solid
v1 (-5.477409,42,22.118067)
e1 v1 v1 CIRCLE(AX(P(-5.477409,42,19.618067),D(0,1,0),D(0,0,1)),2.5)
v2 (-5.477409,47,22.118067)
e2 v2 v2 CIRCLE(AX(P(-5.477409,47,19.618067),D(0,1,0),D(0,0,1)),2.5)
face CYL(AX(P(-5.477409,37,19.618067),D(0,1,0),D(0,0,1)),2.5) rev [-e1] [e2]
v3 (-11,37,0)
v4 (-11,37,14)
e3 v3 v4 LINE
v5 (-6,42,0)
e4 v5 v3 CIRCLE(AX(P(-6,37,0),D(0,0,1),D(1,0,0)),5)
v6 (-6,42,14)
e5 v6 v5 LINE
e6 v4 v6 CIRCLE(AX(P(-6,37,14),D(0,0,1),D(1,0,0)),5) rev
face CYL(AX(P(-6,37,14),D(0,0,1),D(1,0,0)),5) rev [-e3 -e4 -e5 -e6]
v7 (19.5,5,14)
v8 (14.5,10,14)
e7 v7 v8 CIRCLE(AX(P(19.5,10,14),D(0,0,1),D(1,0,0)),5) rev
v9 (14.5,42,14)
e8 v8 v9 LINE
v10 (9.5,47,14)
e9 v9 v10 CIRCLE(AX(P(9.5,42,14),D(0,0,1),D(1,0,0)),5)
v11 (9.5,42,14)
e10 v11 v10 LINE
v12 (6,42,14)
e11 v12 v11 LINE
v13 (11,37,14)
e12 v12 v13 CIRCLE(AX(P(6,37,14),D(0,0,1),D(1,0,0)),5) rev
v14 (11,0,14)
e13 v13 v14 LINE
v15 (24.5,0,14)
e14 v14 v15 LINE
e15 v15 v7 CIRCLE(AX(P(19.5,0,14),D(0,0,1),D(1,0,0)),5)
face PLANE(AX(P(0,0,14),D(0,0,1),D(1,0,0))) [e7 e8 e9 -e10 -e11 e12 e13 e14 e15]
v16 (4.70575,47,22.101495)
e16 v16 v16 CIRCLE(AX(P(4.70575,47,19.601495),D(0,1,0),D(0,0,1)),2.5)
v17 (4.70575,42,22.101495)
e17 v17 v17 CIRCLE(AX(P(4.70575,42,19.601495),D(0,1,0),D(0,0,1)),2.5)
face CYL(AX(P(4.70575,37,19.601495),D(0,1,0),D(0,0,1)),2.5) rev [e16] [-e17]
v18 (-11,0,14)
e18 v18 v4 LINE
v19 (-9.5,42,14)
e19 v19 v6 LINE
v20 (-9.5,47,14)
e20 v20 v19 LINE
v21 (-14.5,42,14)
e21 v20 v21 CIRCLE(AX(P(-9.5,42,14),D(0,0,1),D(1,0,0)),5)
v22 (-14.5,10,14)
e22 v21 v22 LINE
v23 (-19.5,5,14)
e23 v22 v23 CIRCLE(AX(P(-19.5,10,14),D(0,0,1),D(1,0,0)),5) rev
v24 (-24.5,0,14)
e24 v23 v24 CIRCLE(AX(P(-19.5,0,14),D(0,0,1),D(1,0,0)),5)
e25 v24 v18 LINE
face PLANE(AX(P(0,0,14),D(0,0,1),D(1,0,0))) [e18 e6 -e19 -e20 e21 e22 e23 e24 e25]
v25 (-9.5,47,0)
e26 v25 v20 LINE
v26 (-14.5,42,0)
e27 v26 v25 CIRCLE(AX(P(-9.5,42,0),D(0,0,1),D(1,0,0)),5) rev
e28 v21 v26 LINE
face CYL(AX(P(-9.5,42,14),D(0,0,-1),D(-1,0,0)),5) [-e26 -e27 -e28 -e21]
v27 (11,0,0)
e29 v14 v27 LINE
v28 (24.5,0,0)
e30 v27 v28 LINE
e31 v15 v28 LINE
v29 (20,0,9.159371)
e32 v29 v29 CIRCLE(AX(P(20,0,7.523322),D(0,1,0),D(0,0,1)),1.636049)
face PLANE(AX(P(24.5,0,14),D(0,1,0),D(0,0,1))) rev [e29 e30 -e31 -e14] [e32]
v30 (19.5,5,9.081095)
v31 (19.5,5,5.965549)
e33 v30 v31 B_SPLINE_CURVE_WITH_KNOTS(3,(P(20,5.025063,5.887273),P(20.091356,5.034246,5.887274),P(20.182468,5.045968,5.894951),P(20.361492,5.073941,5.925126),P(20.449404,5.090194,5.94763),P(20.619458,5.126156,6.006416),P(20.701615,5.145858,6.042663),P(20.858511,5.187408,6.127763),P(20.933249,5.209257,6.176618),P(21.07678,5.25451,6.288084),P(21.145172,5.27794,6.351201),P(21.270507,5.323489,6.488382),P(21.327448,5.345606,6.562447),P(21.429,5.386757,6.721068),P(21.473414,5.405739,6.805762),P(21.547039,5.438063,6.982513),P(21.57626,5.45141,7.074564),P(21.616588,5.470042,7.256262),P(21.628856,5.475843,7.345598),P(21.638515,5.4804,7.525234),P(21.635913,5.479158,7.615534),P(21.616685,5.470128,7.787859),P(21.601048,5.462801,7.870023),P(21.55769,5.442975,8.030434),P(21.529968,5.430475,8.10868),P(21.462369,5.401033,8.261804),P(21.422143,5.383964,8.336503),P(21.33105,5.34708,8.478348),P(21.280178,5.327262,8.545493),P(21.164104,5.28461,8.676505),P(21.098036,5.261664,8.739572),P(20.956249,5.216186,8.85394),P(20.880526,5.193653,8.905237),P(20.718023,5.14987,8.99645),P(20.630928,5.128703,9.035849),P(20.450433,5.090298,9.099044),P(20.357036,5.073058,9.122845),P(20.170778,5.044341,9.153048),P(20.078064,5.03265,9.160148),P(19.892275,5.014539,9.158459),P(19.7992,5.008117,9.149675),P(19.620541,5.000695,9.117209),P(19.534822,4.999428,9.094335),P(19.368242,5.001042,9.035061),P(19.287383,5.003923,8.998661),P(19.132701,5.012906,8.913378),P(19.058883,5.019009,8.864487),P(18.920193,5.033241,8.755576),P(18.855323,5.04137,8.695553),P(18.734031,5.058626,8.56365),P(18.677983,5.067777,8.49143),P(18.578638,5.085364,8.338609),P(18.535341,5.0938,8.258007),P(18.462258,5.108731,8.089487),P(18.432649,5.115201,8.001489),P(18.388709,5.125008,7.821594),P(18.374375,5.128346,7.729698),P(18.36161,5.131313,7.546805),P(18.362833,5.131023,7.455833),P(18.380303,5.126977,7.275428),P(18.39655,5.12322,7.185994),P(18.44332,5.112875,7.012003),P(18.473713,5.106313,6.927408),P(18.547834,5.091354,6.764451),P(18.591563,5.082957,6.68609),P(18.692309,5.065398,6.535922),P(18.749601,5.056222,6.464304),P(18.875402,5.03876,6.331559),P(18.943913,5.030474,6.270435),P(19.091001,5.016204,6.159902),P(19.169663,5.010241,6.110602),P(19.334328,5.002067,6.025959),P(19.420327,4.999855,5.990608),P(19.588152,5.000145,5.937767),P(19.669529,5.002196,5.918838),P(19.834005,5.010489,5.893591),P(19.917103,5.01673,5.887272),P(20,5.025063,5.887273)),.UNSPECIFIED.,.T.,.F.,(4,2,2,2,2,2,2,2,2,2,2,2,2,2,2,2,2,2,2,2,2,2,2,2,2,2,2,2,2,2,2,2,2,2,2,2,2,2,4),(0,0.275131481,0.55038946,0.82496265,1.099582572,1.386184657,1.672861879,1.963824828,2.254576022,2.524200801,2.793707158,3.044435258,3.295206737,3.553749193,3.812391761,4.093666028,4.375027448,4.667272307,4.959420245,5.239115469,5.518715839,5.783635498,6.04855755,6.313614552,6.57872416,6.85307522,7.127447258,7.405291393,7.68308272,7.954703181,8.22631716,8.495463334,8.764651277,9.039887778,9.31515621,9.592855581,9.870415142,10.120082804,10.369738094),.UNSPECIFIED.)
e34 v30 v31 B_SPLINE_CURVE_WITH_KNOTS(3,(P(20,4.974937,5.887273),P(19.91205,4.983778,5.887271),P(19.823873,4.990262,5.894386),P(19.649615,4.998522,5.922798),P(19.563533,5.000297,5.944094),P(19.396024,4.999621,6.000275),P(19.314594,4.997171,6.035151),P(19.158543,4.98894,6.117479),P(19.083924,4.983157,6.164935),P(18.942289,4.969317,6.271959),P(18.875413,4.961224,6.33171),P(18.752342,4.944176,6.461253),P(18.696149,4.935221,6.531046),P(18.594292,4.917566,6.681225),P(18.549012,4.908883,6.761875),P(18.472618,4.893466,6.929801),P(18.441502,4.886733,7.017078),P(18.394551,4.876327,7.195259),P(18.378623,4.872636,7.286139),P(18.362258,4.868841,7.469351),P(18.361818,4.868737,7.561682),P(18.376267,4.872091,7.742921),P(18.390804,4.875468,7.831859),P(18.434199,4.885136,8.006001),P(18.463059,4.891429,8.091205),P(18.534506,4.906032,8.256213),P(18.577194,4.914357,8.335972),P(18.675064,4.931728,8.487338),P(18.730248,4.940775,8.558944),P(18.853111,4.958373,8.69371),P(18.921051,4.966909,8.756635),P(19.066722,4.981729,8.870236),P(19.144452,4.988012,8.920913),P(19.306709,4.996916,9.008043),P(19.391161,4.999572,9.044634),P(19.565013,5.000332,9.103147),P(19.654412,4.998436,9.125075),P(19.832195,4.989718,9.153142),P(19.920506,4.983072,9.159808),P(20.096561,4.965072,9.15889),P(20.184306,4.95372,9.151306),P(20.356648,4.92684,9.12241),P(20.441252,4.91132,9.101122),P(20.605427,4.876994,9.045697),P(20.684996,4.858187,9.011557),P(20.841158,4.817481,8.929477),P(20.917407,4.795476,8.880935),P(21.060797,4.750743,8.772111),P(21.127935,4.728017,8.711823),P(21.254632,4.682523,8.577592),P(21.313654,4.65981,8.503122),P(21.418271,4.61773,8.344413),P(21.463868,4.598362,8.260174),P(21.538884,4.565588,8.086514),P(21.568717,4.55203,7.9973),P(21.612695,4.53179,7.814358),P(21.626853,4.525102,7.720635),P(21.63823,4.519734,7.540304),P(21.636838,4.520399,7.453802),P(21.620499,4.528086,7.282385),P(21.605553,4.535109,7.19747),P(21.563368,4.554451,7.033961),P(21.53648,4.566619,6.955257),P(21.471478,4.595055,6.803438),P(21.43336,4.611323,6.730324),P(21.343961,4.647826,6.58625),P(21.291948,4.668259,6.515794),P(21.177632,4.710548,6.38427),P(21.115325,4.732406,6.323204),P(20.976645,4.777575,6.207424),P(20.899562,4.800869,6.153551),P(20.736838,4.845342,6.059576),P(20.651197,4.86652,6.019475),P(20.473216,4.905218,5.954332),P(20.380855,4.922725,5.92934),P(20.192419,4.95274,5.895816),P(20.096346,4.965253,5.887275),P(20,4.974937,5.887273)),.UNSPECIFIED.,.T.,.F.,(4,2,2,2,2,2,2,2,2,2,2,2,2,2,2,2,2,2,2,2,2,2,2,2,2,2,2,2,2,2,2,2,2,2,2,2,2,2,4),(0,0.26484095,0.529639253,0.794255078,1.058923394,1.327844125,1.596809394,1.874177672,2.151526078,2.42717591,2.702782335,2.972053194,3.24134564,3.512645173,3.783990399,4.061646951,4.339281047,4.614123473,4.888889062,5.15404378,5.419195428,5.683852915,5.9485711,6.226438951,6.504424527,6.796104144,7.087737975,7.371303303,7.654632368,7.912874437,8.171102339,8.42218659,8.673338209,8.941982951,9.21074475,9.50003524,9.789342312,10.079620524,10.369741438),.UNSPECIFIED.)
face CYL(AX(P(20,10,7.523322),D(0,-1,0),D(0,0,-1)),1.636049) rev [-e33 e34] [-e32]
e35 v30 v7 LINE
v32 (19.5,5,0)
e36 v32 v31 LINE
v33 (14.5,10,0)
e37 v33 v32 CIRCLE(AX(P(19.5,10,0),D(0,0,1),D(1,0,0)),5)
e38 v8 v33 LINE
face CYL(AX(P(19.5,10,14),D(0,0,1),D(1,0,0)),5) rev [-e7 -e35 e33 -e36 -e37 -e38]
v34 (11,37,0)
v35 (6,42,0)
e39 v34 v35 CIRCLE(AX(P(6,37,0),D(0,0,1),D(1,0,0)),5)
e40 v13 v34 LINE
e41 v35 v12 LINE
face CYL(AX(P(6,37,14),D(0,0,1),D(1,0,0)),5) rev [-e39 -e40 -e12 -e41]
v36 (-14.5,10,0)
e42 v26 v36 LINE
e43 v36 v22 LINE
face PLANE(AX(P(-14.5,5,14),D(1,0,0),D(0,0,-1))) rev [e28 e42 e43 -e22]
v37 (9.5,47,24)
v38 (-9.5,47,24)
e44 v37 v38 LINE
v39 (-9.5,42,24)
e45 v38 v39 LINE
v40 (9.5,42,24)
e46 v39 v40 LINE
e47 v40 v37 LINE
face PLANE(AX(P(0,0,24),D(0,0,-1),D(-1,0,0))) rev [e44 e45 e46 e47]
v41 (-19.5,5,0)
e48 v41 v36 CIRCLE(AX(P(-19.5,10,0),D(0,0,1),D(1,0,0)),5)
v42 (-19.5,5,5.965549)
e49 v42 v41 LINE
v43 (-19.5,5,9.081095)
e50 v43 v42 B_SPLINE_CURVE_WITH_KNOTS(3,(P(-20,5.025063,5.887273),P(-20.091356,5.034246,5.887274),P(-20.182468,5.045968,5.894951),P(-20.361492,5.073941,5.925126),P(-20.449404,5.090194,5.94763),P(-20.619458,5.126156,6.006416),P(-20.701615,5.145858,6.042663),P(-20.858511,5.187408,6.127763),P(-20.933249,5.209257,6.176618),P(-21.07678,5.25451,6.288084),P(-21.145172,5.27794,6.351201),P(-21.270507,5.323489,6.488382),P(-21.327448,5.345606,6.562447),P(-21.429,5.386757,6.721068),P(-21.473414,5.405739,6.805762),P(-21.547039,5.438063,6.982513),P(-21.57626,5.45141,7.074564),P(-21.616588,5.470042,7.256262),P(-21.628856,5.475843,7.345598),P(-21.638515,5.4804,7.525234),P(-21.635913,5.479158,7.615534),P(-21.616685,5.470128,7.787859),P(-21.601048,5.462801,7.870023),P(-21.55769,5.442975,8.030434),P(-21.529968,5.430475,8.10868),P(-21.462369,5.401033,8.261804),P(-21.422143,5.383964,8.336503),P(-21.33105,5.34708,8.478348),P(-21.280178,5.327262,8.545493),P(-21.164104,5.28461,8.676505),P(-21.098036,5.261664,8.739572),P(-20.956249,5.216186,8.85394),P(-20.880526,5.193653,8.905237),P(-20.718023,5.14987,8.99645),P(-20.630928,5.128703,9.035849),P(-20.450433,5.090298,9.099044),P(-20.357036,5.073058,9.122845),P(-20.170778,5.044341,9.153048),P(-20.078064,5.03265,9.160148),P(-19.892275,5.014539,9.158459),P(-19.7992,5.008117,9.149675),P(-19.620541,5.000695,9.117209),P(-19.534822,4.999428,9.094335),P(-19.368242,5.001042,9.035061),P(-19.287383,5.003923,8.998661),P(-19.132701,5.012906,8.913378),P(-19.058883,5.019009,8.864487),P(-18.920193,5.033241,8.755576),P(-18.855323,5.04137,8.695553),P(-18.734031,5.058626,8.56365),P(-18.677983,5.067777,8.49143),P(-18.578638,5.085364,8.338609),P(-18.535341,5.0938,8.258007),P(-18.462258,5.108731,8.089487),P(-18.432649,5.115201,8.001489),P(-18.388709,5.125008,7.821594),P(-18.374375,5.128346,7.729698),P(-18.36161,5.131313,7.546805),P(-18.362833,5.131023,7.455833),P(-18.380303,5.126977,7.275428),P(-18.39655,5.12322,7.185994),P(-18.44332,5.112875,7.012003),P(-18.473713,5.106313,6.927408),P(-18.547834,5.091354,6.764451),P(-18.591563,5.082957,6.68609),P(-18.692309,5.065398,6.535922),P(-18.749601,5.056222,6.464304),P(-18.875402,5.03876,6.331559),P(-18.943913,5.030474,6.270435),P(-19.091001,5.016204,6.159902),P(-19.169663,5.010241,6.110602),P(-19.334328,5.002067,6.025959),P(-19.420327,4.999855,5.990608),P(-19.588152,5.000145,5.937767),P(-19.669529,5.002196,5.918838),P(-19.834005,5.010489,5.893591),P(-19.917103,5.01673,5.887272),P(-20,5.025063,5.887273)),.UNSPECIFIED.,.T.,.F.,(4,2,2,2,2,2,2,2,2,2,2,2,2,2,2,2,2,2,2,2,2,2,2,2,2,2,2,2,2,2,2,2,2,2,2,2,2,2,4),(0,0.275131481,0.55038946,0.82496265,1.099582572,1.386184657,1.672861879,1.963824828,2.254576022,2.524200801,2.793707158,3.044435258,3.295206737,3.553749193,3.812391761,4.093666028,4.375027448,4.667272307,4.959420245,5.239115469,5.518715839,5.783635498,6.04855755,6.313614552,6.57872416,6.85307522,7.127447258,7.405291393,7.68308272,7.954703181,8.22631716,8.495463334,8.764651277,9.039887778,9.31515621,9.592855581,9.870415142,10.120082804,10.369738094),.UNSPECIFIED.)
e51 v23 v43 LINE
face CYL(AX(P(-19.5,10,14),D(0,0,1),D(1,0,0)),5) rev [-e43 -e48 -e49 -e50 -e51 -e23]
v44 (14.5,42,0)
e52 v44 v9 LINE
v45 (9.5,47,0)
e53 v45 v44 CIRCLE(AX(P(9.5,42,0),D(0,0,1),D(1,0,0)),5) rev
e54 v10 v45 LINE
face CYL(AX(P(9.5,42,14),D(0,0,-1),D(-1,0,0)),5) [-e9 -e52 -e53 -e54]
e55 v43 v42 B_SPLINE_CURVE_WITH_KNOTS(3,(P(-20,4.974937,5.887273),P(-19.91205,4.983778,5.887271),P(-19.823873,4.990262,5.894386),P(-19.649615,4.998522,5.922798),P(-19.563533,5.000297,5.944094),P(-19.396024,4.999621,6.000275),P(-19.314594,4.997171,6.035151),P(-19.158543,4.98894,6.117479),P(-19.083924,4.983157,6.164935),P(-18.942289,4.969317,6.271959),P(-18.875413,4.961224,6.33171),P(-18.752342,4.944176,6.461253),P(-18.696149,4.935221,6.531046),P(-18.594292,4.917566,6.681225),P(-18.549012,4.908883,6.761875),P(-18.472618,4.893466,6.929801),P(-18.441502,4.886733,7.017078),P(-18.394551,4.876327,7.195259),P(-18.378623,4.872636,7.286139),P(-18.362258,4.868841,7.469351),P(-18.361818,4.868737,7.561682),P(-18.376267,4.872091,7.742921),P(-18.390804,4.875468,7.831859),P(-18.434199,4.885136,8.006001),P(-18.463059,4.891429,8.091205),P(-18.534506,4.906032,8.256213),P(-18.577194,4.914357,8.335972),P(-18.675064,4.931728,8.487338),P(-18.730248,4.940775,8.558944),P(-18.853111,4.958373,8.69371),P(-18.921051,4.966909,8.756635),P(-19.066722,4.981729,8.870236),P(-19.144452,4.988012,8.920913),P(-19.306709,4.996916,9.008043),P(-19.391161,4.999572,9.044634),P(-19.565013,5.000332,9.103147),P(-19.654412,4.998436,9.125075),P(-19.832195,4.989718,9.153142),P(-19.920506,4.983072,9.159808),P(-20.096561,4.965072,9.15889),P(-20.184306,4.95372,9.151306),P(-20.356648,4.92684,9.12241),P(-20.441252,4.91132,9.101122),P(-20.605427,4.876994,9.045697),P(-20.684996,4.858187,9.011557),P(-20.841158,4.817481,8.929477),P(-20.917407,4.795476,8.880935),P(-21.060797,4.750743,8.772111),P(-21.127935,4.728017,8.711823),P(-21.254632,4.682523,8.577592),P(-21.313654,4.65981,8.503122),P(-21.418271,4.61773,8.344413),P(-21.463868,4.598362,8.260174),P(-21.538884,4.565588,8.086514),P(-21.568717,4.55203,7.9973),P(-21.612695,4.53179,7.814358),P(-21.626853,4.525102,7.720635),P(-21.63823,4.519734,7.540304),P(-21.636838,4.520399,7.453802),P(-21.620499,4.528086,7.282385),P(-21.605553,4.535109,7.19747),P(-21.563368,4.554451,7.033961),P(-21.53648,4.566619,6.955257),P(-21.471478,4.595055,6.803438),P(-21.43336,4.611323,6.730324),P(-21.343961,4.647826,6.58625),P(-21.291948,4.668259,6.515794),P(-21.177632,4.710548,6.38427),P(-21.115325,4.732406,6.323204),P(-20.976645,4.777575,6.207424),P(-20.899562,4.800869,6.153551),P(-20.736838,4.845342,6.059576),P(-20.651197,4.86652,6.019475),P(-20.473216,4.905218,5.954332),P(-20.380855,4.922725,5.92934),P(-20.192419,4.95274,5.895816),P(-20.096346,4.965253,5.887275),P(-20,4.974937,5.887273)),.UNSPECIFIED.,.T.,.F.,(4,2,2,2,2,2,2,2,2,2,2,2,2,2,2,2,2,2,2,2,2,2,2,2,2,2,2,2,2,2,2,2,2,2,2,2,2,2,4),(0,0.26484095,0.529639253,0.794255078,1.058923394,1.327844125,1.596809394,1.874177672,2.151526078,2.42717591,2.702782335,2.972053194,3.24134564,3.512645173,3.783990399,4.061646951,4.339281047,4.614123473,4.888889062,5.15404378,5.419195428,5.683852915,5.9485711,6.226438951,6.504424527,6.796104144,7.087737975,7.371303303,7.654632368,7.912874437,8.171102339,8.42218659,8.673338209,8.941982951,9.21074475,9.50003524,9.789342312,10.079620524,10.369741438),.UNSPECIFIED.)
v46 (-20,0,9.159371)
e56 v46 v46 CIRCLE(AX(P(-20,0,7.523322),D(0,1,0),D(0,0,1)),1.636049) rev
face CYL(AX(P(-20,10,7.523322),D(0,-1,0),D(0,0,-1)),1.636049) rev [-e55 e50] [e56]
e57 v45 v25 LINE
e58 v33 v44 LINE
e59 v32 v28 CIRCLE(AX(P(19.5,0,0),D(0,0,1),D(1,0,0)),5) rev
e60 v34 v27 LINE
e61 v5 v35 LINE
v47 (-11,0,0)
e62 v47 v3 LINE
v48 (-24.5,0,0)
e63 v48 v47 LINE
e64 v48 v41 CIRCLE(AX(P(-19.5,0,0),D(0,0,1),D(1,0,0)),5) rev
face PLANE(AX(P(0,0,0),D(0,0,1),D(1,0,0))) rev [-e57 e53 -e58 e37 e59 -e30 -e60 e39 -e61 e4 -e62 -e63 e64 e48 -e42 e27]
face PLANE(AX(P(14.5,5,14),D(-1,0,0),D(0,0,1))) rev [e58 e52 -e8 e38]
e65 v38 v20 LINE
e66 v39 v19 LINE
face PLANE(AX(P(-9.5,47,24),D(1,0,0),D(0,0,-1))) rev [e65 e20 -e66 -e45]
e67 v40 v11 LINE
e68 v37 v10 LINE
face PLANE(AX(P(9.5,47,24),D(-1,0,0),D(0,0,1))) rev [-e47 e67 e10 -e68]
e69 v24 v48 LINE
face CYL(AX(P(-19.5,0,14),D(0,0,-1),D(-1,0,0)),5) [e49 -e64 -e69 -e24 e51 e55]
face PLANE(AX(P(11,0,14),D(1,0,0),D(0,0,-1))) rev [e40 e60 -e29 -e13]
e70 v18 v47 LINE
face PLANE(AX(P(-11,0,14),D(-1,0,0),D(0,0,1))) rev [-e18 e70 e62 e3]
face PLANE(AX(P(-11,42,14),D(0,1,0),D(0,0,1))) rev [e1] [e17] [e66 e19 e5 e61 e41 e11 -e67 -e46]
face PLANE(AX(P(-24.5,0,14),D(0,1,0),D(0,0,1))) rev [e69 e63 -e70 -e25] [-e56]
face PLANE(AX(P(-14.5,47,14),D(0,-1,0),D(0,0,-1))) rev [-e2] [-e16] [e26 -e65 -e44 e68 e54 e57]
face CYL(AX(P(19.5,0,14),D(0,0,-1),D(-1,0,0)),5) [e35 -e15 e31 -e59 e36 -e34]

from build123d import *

# Parameters (mm, degrees)
BOSS_EXTRUDE1_DEPTH     = 14
FILLET1_R               = 5
FILLET2_R               = 5
CUT_EXTRUDE3_DEPTH      = 10
CUT_EXTRUDE3_DEPTH_BACK = 10
SKETCH2_R               = 1.636049027
SKETCH4_W               = 19
SKETCH4_H               = 5
BOSS_EXTRUDE2_DEPTH     = 10
SKETCH5_R               = 2.5
CUT_EXTRUDE4_DEPTH      = 10


with BuildPart() as part:
    # Sketch1 → Boss-Extrude1 (new body)
    with BuildSketch(Plane.XY):
        Polygon((-24.5, 0), (-24.5, 5), (-14.5, 5), (-14.5, 47), (14.5, 47), (14.5, 5), (24.5, 5), (24.5, 0), (11, 0), (11, 42), (-11, 42), (-11, 0), align=None)
    extrude(amount=BOSS_EXTRUDE1_DEPTH)

    # Fillet1
    fillet1_edges = [part.edges().sort_by_distance(p)[0] for p in [
        (-14.5, 47, 7),
        (14.5, 47, 7),
        (24.5, 5, 7),
        (-24.5, 5, 7),
        (14.5, 5, 7),
        (-14.5, 5, 7),
    ]]
    fillet(fillet1_edges, radius=FILLET1_R - 0.0001)  # a hair under: the kernel refuses the full size

    # Fillet2
    fillet2_edges = [part.edges().sort_by_distance(p)[0] for p in [
        (11, 42, 7),
        (-11, 42, 7),
    ]]
    fillet(fillet2_edges, radius=FILLET2_R)

    # Sketch2 → Cut-Extrude3 (cut, two sides: drawn at the far end of the back side and taken through both)
    with BuildSketch(Plane(origin=(0, 0, 0), x_dir=(1, 0, 0), z_dir=(0, 1, 0)).offset(-CUT_EXTRUDE3_DEPTH_BACK)):
        with Locations(Location((-20, -7.523321805, 0), (0, 0, 72.20487372))):
            Circle(SKETCH2_R)
        with Locations(Location((20, -7.523321805, 0), (0, 0, 107.795126278))):
            Circle(SKETCH2_R)
    extrude(amount=CUT_EXTRUDE3_DEPTH + CUT_EXTRUDE3_DEPTH_BACK, mode=Mode.SUBTRACT)

    # Sketch4 → Boss-Extrude2 (add)
    with BuildSketch(Plane.XY.offset(14)):
        with Locations((0, 44.5)):
            Rectangle(SKETCH4_W, SKETCH4_H)
    extrude(amount=BOSS_EXTRUDE2_DEPTH)

    # Sketch5 → Cut-Extrude4 (cut)
    with BuildSketch(Plane(origin=(0, 47, 0), x_dir=(1, 0, 0), z_dir=(0, 1, 0))):
        with Locations(Location((4.70575, -19.60149527, 0), (0, 0, 270))):
            Circle(SKETCH5_R)
        with Locations(Location((-5.477408827, -19.618067384, 0), (0, 0, 270))):
            Circle(SKETCH5_R)
    extrude(amount=-CUT_EXTRUDE4_DEPTH, mode=Mode.SUBTRACT)


solid = part.part
